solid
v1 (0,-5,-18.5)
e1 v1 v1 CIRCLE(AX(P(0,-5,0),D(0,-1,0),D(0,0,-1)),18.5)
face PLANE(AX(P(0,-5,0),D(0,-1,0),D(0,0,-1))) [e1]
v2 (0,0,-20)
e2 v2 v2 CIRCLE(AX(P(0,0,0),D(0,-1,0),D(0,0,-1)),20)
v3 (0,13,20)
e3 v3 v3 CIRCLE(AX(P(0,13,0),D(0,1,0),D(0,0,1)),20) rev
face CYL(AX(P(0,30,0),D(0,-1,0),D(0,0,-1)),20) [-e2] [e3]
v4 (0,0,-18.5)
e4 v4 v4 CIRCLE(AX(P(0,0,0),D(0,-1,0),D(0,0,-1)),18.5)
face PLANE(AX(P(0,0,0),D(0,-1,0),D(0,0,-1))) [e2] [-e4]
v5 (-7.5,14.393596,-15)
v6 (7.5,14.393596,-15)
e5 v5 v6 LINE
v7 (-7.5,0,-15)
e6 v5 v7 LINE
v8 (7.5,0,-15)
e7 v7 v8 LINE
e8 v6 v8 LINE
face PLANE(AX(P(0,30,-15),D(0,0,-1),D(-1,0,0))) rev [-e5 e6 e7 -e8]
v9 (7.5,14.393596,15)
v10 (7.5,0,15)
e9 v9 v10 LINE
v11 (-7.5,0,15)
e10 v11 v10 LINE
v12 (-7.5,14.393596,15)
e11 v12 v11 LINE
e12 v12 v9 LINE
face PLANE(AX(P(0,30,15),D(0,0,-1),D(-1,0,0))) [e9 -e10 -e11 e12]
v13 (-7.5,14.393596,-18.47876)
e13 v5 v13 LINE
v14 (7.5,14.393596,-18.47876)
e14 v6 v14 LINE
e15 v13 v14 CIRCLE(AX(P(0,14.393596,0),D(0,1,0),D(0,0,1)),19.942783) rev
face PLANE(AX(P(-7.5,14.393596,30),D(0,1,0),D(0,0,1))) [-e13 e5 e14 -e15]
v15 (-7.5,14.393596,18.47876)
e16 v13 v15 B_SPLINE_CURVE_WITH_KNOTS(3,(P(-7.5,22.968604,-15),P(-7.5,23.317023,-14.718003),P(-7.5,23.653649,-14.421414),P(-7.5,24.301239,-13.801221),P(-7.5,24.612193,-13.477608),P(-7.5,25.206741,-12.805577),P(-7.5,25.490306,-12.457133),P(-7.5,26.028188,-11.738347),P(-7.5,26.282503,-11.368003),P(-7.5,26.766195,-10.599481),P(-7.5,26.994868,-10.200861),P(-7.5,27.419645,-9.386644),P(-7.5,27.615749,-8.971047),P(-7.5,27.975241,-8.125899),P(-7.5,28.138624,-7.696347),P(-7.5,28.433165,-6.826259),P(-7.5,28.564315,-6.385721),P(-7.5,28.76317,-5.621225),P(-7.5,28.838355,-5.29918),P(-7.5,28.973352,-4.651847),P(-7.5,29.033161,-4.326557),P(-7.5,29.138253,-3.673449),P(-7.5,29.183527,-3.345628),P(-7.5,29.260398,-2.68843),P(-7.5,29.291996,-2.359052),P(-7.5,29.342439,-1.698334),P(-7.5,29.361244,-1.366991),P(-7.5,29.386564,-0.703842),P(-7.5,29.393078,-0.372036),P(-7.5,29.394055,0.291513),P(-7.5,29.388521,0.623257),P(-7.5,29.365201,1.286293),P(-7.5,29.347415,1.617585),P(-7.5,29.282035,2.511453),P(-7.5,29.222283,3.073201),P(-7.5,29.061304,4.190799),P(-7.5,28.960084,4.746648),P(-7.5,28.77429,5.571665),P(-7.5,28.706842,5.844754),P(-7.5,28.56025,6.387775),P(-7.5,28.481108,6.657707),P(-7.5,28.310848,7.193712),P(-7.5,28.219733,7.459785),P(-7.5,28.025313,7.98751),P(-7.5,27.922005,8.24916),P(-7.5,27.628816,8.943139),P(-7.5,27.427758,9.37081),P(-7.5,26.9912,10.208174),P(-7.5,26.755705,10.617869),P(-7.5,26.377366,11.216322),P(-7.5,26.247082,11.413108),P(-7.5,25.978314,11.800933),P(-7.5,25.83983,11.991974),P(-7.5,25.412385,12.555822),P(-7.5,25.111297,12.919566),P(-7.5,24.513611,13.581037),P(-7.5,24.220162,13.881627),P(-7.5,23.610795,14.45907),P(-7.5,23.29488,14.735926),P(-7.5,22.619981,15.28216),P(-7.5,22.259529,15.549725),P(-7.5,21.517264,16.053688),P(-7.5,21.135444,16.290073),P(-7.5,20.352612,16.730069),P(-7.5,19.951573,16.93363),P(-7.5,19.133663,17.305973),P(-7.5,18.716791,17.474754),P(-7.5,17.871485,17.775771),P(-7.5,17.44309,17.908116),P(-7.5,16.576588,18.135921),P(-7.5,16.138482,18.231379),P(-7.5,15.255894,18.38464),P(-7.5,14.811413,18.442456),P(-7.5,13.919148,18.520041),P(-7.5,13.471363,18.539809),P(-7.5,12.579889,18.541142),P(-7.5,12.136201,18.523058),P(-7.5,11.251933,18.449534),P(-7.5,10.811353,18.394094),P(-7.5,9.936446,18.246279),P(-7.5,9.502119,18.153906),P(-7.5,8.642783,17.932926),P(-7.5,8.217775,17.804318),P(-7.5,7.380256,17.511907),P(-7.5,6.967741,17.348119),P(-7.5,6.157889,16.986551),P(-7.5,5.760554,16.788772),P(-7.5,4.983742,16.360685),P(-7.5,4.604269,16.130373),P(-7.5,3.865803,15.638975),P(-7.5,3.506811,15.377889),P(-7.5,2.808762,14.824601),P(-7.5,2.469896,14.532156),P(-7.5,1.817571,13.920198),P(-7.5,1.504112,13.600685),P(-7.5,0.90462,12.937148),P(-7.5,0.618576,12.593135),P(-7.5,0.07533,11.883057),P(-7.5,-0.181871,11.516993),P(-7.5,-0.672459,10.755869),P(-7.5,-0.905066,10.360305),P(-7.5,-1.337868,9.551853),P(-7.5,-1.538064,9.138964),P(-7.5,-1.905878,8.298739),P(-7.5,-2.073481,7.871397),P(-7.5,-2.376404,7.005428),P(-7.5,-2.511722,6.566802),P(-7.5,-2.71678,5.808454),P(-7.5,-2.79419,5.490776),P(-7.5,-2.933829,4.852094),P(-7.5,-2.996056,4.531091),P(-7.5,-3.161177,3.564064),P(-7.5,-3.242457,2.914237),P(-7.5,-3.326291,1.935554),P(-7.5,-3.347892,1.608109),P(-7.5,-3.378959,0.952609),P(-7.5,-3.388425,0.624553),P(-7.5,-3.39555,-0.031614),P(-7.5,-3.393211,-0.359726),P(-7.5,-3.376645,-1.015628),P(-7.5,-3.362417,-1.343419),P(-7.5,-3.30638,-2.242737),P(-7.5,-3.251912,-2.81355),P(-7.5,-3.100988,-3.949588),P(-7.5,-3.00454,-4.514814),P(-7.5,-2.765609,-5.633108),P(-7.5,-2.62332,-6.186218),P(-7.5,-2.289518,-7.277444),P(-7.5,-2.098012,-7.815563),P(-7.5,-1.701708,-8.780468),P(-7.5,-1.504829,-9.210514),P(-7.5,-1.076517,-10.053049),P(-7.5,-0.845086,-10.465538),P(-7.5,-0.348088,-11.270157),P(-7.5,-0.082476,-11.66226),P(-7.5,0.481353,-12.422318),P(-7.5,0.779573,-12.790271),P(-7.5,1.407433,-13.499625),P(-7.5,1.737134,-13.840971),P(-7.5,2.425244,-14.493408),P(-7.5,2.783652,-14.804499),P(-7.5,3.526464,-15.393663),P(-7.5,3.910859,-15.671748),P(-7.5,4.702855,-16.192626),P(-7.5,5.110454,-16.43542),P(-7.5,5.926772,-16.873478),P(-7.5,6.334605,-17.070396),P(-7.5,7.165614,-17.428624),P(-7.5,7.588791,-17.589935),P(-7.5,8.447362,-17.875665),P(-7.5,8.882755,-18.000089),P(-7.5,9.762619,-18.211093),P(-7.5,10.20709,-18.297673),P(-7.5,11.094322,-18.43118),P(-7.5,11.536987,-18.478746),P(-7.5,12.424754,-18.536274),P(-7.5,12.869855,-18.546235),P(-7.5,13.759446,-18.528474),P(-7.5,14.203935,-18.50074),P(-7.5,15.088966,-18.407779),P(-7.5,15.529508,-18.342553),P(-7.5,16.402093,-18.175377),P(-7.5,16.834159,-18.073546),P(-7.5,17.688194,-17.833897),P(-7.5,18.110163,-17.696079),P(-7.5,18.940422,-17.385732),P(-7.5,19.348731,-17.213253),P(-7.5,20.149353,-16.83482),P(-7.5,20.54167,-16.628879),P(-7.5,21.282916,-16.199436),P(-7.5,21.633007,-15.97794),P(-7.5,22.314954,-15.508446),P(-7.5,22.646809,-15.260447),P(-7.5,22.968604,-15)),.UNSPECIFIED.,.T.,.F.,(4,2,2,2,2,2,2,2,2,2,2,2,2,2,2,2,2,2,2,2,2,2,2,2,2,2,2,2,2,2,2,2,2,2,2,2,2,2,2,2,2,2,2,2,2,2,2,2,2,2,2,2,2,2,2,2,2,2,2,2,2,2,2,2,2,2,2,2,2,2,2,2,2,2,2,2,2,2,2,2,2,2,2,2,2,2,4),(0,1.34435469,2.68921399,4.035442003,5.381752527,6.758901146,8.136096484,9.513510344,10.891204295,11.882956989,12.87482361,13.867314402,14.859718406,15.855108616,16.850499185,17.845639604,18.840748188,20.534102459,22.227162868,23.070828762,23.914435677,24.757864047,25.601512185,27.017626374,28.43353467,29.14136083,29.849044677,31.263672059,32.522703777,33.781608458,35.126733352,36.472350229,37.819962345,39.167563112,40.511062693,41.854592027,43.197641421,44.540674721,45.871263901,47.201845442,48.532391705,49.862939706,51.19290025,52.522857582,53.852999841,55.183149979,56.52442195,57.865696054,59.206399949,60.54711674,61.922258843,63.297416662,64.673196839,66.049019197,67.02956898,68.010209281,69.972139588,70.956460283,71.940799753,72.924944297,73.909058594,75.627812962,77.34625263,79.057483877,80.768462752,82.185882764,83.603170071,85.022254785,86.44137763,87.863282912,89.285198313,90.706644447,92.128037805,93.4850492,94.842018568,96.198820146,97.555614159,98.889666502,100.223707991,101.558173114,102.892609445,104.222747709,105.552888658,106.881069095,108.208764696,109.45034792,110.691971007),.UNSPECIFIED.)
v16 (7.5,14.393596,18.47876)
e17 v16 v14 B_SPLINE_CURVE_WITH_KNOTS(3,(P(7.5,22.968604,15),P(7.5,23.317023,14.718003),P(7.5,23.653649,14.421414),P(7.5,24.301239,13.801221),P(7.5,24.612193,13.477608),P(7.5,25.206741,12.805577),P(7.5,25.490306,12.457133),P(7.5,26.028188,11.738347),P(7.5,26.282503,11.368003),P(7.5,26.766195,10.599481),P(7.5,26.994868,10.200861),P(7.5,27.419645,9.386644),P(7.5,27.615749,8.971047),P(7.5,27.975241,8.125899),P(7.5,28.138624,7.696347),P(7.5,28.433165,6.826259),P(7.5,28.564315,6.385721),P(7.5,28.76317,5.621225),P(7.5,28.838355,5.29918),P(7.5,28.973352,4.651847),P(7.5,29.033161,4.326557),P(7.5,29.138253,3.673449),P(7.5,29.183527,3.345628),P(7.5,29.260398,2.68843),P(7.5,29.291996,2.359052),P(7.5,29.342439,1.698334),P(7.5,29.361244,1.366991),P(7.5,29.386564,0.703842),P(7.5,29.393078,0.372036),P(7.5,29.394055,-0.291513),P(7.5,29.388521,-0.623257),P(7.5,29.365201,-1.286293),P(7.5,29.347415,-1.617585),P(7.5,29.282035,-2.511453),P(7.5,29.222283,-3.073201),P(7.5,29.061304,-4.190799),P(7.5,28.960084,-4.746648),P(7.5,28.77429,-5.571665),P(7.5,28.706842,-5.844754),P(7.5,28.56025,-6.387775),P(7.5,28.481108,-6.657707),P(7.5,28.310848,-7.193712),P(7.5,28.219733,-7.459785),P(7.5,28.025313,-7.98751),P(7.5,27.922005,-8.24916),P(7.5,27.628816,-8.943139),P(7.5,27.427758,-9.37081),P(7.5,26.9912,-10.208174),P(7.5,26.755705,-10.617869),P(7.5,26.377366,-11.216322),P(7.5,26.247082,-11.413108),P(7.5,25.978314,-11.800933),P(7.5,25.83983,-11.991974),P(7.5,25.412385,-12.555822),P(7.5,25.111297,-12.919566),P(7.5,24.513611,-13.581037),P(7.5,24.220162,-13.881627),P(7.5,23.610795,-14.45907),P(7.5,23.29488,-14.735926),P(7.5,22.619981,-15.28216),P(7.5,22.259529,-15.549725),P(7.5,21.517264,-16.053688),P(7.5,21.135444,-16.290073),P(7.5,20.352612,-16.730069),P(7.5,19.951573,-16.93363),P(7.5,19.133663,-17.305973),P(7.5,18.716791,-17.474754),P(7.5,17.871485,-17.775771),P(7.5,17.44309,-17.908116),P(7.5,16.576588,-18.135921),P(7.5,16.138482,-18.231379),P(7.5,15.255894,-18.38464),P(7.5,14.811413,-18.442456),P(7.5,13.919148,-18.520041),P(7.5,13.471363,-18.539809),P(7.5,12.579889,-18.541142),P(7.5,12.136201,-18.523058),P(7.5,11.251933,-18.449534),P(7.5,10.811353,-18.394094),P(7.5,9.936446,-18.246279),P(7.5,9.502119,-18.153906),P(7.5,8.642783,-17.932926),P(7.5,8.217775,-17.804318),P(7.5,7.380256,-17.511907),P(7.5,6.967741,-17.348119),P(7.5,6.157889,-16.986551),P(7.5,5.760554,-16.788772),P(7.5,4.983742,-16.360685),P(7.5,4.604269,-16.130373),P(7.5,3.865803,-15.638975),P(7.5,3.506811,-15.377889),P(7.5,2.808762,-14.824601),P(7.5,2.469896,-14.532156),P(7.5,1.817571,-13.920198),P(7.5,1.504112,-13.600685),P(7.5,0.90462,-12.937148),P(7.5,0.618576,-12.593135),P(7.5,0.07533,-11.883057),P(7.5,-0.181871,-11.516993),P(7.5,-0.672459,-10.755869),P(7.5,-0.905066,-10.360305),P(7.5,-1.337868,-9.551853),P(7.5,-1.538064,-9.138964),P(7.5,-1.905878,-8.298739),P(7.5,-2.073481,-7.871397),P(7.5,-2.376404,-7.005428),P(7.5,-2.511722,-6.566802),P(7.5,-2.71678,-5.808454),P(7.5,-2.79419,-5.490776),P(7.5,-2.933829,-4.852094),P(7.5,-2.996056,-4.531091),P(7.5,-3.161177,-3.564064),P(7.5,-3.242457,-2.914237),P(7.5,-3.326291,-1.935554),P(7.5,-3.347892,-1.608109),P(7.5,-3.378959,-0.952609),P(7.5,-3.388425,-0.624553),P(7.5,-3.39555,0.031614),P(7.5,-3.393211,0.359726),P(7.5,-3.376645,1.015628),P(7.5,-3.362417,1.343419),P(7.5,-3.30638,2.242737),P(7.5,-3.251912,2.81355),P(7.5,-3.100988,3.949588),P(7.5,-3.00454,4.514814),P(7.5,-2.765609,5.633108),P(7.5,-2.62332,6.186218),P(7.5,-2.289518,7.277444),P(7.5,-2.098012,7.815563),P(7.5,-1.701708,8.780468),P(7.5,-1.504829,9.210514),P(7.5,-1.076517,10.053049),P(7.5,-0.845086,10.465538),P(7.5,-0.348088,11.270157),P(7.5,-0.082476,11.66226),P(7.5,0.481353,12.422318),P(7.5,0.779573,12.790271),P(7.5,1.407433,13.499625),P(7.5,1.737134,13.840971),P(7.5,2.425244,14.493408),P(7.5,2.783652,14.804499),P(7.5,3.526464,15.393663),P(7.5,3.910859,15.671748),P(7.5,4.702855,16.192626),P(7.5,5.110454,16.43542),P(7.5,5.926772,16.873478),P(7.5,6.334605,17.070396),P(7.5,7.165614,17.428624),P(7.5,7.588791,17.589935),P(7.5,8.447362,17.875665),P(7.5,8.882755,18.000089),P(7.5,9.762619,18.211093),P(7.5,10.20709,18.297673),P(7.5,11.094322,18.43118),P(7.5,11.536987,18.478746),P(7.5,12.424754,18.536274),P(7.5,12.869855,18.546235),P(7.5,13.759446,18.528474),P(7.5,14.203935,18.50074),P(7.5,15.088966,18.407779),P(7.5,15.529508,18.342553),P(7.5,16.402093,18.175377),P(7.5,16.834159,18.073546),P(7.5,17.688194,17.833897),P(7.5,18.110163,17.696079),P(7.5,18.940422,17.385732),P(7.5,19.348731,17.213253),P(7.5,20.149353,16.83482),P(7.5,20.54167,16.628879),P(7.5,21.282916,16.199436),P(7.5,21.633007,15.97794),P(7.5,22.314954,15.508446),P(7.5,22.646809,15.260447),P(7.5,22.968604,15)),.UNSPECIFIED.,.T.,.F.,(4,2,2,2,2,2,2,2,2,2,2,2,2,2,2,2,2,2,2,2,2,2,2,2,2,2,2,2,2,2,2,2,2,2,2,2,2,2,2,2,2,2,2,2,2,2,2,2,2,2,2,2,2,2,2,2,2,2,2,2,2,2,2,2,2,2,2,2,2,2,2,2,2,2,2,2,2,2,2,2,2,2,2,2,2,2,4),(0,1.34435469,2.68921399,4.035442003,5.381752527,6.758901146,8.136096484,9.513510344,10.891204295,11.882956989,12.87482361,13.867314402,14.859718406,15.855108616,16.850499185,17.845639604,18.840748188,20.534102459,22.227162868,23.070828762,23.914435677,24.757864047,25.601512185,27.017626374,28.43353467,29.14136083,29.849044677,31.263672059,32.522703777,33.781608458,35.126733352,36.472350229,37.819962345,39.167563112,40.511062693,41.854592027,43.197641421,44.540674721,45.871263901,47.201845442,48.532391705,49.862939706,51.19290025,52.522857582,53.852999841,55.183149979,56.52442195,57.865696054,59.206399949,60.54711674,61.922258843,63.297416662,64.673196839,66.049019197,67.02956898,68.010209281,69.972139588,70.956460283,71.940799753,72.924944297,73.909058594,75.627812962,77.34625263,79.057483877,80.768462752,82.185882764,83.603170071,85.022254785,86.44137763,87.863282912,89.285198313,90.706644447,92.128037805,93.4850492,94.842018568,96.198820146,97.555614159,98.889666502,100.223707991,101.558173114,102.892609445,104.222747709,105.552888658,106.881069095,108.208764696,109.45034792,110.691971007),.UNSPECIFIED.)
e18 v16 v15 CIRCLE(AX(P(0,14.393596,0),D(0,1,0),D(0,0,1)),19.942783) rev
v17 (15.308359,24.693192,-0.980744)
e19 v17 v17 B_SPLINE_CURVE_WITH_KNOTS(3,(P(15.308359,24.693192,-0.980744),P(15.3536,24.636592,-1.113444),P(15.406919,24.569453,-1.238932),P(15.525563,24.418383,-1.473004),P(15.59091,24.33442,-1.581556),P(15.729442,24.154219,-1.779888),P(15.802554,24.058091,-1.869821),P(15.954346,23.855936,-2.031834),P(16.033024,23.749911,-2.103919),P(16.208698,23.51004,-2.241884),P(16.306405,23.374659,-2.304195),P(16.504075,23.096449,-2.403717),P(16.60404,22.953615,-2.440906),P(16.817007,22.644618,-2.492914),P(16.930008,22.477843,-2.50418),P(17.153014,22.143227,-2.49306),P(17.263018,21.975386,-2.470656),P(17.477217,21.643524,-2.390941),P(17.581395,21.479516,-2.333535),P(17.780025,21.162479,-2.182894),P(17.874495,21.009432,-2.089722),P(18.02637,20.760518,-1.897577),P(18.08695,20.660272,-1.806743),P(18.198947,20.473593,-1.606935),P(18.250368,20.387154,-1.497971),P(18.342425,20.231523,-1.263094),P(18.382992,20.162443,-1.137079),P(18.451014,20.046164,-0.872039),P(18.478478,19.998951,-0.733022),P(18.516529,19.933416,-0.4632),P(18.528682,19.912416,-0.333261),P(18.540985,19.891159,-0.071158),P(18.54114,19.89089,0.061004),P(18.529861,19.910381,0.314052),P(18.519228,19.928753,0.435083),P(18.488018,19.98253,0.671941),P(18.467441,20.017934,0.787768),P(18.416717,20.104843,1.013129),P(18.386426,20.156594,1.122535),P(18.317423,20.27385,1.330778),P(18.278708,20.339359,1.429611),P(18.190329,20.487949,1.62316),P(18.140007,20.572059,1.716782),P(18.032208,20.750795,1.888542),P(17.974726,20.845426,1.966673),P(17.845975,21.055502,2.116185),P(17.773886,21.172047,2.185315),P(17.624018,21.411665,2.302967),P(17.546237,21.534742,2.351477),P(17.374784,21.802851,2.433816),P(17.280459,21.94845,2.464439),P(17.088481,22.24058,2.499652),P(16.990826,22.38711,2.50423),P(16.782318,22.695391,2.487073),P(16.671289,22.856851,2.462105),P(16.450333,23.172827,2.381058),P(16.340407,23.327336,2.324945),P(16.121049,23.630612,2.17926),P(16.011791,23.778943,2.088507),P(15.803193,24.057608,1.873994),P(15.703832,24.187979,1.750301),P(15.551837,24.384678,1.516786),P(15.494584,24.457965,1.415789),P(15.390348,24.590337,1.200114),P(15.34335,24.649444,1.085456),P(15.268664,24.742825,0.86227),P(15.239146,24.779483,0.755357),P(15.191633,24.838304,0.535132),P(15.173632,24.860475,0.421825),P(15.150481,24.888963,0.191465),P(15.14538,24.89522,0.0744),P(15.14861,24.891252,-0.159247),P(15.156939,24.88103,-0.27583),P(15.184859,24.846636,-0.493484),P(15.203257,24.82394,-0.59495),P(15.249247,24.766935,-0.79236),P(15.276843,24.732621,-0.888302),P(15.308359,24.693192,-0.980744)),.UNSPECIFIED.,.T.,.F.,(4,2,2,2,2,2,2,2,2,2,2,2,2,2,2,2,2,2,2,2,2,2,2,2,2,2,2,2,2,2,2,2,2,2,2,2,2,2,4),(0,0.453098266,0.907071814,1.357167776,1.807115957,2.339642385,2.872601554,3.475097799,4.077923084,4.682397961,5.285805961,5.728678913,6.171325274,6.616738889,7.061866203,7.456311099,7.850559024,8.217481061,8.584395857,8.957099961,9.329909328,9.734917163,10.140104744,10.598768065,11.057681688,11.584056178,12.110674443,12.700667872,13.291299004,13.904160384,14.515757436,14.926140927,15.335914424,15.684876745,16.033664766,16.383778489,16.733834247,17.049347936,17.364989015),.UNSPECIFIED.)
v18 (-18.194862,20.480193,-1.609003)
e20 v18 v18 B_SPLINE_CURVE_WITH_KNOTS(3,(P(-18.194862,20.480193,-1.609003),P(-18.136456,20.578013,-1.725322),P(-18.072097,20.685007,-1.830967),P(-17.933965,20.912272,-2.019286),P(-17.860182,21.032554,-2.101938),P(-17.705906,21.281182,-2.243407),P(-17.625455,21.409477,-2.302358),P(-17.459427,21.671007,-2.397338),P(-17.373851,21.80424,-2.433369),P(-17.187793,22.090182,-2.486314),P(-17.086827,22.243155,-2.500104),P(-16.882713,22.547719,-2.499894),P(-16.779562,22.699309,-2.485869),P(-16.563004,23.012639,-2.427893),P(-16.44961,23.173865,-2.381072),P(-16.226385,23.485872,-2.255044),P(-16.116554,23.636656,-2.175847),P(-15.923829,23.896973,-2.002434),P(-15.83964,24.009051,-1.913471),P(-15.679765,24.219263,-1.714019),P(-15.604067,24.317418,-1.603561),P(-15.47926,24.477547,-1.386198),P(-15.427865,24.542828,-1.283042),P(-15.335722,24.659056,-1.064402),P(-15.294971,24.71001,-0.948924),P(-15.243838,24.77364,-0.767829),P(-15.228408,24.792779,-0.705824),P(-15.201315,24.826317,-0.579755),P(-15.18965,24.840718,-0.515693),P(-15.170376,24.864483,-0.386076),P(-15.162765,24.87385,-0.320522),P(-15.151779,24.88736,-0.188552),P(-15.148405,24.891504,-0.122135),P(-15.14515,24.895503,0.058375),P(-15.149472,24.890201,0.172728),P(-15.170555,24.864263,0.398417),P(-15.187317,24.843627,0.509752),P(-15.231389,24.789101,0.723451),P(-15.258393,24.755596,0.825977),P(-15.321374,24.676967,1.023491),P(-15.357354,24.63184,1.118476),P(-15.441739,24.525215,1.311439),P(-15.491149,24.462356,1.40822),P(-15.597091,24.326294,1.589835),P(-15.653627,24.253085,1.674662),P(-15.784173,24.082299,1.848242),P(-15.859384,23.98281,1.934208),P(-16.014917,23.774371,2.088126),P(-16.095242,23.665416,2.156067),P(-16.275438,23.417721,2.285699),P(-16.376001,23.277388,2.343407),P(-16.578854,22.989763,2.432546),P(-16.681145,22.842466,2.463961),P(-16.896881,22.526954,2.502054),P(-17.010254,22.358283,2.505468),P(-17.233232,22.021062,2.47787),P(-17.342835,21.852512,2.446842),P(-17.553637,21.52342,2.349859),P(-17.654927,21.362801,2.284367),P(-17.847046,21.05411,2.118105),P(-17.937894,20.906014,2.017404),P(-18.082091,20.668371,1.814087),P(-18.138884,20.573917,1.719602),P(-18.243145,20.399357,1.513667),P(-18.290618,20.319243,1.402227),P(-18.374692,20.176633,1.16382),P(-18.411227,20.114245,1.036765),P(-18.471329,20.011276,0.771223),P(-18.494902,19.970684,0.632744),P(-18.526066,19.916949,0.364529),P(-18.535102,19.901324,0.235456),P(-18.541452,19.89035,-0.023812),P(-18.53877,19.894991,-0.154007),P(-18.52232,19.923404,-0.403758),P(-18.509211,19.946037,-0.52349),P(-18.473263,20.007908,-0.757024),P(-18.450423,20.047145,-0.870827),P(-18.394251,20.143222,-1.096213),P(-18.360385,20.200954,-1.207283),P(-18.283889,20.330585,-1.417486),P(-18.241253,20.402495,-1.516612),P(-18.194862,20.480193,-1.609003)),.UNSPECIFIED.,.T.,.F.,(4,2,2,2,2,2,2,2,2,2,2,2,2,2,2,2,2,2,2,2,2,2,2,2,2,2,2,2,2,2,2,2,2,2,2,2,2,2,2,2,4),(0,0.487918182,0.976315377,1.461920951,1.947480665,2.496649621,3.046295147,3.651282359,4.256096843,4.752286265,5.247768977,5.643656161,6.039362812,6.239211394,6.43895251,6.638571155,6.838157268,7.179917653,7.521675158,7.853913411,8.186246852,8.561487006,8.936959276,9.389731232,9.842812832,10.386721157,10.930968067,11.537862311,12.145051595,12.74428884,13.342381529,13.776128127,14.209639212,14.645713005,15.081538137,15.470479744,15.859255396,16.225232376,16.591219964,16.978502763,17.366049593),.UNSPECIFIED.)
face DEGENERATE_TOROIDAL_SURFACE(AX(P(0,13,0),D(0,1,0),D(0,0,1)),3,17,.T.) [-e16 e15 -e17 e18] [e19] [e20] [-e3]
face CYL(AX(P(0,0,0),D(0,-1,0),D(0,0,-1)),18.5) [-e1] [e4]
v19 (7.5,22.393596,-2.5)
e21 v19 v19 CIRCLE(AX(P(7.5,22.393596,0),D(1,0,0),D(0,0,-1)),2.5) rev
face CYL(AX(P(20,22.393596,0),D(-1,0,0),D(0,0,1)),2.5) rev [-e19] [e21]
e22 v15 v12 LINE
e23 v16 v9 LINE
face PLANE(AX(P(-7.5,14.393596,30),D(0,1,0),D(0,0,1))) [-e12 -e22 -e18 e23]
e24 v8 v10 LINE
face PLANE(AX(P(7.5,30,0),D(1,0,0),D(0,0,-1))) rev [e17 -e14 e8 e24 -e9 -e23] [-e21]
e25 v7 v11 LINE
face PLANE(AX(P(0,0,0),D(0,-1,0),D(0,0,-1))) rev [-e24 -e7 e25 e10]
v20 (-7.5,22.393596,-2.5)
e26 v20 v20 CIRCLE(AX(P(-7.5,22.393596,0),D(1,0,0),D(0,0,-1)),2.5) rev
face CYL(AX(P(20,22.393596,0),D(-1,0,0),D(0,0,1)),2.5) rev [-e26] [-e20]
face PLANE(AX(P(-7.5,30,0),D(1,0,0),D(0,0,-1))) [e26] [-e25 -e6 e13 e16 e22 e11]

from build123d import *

# Parameters (mm, degrees)
SKETCH2_R               = 20
SKETCH2_W               = 15
SKETCH2_H               = 30
BOSS_EXTRUDE1_DEPTH     = 30
FILLET1_R               = 17
CUT_EXTRUDE1_DEPTH      = 30
CUT_EXTRUDE1_DEPTH_BACK = 30
SKETCH3_W               = 15
SKETCH3_H               = 15
BOSS_EXTRUDE3_START     = 5
SKETCH4_R               = 20
BOSS_EXTRUDE3_DEPTH     = 5
SKETCH5_R               = 20
SKETCH5_R_2             = 18.5
CUT_EXTRUDE2_DEPTH      = 5
CUT_EXTRUDE3_DEPTH      = 20
CUT_EXTRUDE3_DEPTH_BACK = 40
SKETCH6_R               = 2.5


with BuildPart() as part:
    # Sketch2 → Boss-Extrude1 (new body)
    with BuildSketch(Plane(origin=(0, 0, 0), x_dir=(1, 0, 0), z_dir=(0, 1, 0))):
        with Locations(Location((0, 0, 0), (0, 0, 270))):
            Circle(SKETCH2_R)
        Rectangle(SKETCH2_W, SKETCH2_H, mode=Mode.SUBTRACT)
    extrude(amount=BOSS_EXTRUDE1_DEPTH)

    # Fillet1
    # the kernel refuses this fillet: 17 mm, written as the material it takes off along each edge
    with BuildSketch(Plane(origin=(0, 30, 0), x_dir=(0, 0, 1), z_dir=(-1, 0, 0))) as fillet1_piece_1:
        with BuildLine():
            CenterArc((20 - FILLET1_R, -FILLET1_R), FILLET1_R, 0, 90)
            Line((20 - FILLET1_R, 0), (20, 0))
            Line((20, 0), (20, -FILLET1_R))
        make_face()
    revolve(axis=Axis((0, 30, 0), (0, 1, 0)), mode=Mode.SUBTRACT)

    # Sketch3 → Cut-Extrude1 (cut, two sides: drawn at the far end of the back side and taken through both)
    with BuildSketch(Plane.XY.offset(-CUT_EXTRUDE1_DEPTH_BACK)):
        with Locations((0, 21.893596311)):
            Rectangle(SKETCH3_W, SKETCH3_H)
    extrude(amount=CUT_EXTRUDE1_DEPTH + CUT_EXTRUDE1_DEPTH_BACK, mode=Mode.SUBTRACT)

    # Sketch4 → Boss-Extrude3 (add)
    with BuildSketch(Plane.XZ.offset(BOSS_EXTRUDE3_START)):
        with Locations(Location((0, 0, 0), (0, 0, 270))):
            Circle(SKETCH4_R)
    extrude(amount=-BOSS_EXTRUDE3_DEPTH)

    # Sketch5 → Cut-Extrude2 (cut)
    with BuildSketch(Plane.XZ.offset(5)):
        with Locations(Location((0, 0, 0), (0, 0, 270))):
            Circle(SKETCH5_R)
        with Locations(Location((0, 0, 0), (0, 0, 270))):
            Circle(SKETCH5_R_2, mode=Mode.SUBTRACT)
    extrude(amount=-CUT_EXTRUDE2_DEPTH, mode=Mode.SUBTRACT)

    # Sketch6 → Cut-Extrude3 (cut, two sides: drawn at the far end of the back side and taken through both)
    with BuildSketch(Plane(origin=(0, 0, 0), x_dir=(0, 0, -1), z_dir=(1, 0, 0)).offset(-CUT_EXTRUDE3_DEPTH_BACK)):
        with Locations(Location((0, 22.393596311, 0), (0, 0, 310.060861392))):
            Circle(SKETCH6_R)
    extrude(amount=CUT_EXTRUDE3_DEPTH + CUT_EXTRUDE3_DEPTH_BACK, mode=Mode.SUBTRACT)


solid = part.part
